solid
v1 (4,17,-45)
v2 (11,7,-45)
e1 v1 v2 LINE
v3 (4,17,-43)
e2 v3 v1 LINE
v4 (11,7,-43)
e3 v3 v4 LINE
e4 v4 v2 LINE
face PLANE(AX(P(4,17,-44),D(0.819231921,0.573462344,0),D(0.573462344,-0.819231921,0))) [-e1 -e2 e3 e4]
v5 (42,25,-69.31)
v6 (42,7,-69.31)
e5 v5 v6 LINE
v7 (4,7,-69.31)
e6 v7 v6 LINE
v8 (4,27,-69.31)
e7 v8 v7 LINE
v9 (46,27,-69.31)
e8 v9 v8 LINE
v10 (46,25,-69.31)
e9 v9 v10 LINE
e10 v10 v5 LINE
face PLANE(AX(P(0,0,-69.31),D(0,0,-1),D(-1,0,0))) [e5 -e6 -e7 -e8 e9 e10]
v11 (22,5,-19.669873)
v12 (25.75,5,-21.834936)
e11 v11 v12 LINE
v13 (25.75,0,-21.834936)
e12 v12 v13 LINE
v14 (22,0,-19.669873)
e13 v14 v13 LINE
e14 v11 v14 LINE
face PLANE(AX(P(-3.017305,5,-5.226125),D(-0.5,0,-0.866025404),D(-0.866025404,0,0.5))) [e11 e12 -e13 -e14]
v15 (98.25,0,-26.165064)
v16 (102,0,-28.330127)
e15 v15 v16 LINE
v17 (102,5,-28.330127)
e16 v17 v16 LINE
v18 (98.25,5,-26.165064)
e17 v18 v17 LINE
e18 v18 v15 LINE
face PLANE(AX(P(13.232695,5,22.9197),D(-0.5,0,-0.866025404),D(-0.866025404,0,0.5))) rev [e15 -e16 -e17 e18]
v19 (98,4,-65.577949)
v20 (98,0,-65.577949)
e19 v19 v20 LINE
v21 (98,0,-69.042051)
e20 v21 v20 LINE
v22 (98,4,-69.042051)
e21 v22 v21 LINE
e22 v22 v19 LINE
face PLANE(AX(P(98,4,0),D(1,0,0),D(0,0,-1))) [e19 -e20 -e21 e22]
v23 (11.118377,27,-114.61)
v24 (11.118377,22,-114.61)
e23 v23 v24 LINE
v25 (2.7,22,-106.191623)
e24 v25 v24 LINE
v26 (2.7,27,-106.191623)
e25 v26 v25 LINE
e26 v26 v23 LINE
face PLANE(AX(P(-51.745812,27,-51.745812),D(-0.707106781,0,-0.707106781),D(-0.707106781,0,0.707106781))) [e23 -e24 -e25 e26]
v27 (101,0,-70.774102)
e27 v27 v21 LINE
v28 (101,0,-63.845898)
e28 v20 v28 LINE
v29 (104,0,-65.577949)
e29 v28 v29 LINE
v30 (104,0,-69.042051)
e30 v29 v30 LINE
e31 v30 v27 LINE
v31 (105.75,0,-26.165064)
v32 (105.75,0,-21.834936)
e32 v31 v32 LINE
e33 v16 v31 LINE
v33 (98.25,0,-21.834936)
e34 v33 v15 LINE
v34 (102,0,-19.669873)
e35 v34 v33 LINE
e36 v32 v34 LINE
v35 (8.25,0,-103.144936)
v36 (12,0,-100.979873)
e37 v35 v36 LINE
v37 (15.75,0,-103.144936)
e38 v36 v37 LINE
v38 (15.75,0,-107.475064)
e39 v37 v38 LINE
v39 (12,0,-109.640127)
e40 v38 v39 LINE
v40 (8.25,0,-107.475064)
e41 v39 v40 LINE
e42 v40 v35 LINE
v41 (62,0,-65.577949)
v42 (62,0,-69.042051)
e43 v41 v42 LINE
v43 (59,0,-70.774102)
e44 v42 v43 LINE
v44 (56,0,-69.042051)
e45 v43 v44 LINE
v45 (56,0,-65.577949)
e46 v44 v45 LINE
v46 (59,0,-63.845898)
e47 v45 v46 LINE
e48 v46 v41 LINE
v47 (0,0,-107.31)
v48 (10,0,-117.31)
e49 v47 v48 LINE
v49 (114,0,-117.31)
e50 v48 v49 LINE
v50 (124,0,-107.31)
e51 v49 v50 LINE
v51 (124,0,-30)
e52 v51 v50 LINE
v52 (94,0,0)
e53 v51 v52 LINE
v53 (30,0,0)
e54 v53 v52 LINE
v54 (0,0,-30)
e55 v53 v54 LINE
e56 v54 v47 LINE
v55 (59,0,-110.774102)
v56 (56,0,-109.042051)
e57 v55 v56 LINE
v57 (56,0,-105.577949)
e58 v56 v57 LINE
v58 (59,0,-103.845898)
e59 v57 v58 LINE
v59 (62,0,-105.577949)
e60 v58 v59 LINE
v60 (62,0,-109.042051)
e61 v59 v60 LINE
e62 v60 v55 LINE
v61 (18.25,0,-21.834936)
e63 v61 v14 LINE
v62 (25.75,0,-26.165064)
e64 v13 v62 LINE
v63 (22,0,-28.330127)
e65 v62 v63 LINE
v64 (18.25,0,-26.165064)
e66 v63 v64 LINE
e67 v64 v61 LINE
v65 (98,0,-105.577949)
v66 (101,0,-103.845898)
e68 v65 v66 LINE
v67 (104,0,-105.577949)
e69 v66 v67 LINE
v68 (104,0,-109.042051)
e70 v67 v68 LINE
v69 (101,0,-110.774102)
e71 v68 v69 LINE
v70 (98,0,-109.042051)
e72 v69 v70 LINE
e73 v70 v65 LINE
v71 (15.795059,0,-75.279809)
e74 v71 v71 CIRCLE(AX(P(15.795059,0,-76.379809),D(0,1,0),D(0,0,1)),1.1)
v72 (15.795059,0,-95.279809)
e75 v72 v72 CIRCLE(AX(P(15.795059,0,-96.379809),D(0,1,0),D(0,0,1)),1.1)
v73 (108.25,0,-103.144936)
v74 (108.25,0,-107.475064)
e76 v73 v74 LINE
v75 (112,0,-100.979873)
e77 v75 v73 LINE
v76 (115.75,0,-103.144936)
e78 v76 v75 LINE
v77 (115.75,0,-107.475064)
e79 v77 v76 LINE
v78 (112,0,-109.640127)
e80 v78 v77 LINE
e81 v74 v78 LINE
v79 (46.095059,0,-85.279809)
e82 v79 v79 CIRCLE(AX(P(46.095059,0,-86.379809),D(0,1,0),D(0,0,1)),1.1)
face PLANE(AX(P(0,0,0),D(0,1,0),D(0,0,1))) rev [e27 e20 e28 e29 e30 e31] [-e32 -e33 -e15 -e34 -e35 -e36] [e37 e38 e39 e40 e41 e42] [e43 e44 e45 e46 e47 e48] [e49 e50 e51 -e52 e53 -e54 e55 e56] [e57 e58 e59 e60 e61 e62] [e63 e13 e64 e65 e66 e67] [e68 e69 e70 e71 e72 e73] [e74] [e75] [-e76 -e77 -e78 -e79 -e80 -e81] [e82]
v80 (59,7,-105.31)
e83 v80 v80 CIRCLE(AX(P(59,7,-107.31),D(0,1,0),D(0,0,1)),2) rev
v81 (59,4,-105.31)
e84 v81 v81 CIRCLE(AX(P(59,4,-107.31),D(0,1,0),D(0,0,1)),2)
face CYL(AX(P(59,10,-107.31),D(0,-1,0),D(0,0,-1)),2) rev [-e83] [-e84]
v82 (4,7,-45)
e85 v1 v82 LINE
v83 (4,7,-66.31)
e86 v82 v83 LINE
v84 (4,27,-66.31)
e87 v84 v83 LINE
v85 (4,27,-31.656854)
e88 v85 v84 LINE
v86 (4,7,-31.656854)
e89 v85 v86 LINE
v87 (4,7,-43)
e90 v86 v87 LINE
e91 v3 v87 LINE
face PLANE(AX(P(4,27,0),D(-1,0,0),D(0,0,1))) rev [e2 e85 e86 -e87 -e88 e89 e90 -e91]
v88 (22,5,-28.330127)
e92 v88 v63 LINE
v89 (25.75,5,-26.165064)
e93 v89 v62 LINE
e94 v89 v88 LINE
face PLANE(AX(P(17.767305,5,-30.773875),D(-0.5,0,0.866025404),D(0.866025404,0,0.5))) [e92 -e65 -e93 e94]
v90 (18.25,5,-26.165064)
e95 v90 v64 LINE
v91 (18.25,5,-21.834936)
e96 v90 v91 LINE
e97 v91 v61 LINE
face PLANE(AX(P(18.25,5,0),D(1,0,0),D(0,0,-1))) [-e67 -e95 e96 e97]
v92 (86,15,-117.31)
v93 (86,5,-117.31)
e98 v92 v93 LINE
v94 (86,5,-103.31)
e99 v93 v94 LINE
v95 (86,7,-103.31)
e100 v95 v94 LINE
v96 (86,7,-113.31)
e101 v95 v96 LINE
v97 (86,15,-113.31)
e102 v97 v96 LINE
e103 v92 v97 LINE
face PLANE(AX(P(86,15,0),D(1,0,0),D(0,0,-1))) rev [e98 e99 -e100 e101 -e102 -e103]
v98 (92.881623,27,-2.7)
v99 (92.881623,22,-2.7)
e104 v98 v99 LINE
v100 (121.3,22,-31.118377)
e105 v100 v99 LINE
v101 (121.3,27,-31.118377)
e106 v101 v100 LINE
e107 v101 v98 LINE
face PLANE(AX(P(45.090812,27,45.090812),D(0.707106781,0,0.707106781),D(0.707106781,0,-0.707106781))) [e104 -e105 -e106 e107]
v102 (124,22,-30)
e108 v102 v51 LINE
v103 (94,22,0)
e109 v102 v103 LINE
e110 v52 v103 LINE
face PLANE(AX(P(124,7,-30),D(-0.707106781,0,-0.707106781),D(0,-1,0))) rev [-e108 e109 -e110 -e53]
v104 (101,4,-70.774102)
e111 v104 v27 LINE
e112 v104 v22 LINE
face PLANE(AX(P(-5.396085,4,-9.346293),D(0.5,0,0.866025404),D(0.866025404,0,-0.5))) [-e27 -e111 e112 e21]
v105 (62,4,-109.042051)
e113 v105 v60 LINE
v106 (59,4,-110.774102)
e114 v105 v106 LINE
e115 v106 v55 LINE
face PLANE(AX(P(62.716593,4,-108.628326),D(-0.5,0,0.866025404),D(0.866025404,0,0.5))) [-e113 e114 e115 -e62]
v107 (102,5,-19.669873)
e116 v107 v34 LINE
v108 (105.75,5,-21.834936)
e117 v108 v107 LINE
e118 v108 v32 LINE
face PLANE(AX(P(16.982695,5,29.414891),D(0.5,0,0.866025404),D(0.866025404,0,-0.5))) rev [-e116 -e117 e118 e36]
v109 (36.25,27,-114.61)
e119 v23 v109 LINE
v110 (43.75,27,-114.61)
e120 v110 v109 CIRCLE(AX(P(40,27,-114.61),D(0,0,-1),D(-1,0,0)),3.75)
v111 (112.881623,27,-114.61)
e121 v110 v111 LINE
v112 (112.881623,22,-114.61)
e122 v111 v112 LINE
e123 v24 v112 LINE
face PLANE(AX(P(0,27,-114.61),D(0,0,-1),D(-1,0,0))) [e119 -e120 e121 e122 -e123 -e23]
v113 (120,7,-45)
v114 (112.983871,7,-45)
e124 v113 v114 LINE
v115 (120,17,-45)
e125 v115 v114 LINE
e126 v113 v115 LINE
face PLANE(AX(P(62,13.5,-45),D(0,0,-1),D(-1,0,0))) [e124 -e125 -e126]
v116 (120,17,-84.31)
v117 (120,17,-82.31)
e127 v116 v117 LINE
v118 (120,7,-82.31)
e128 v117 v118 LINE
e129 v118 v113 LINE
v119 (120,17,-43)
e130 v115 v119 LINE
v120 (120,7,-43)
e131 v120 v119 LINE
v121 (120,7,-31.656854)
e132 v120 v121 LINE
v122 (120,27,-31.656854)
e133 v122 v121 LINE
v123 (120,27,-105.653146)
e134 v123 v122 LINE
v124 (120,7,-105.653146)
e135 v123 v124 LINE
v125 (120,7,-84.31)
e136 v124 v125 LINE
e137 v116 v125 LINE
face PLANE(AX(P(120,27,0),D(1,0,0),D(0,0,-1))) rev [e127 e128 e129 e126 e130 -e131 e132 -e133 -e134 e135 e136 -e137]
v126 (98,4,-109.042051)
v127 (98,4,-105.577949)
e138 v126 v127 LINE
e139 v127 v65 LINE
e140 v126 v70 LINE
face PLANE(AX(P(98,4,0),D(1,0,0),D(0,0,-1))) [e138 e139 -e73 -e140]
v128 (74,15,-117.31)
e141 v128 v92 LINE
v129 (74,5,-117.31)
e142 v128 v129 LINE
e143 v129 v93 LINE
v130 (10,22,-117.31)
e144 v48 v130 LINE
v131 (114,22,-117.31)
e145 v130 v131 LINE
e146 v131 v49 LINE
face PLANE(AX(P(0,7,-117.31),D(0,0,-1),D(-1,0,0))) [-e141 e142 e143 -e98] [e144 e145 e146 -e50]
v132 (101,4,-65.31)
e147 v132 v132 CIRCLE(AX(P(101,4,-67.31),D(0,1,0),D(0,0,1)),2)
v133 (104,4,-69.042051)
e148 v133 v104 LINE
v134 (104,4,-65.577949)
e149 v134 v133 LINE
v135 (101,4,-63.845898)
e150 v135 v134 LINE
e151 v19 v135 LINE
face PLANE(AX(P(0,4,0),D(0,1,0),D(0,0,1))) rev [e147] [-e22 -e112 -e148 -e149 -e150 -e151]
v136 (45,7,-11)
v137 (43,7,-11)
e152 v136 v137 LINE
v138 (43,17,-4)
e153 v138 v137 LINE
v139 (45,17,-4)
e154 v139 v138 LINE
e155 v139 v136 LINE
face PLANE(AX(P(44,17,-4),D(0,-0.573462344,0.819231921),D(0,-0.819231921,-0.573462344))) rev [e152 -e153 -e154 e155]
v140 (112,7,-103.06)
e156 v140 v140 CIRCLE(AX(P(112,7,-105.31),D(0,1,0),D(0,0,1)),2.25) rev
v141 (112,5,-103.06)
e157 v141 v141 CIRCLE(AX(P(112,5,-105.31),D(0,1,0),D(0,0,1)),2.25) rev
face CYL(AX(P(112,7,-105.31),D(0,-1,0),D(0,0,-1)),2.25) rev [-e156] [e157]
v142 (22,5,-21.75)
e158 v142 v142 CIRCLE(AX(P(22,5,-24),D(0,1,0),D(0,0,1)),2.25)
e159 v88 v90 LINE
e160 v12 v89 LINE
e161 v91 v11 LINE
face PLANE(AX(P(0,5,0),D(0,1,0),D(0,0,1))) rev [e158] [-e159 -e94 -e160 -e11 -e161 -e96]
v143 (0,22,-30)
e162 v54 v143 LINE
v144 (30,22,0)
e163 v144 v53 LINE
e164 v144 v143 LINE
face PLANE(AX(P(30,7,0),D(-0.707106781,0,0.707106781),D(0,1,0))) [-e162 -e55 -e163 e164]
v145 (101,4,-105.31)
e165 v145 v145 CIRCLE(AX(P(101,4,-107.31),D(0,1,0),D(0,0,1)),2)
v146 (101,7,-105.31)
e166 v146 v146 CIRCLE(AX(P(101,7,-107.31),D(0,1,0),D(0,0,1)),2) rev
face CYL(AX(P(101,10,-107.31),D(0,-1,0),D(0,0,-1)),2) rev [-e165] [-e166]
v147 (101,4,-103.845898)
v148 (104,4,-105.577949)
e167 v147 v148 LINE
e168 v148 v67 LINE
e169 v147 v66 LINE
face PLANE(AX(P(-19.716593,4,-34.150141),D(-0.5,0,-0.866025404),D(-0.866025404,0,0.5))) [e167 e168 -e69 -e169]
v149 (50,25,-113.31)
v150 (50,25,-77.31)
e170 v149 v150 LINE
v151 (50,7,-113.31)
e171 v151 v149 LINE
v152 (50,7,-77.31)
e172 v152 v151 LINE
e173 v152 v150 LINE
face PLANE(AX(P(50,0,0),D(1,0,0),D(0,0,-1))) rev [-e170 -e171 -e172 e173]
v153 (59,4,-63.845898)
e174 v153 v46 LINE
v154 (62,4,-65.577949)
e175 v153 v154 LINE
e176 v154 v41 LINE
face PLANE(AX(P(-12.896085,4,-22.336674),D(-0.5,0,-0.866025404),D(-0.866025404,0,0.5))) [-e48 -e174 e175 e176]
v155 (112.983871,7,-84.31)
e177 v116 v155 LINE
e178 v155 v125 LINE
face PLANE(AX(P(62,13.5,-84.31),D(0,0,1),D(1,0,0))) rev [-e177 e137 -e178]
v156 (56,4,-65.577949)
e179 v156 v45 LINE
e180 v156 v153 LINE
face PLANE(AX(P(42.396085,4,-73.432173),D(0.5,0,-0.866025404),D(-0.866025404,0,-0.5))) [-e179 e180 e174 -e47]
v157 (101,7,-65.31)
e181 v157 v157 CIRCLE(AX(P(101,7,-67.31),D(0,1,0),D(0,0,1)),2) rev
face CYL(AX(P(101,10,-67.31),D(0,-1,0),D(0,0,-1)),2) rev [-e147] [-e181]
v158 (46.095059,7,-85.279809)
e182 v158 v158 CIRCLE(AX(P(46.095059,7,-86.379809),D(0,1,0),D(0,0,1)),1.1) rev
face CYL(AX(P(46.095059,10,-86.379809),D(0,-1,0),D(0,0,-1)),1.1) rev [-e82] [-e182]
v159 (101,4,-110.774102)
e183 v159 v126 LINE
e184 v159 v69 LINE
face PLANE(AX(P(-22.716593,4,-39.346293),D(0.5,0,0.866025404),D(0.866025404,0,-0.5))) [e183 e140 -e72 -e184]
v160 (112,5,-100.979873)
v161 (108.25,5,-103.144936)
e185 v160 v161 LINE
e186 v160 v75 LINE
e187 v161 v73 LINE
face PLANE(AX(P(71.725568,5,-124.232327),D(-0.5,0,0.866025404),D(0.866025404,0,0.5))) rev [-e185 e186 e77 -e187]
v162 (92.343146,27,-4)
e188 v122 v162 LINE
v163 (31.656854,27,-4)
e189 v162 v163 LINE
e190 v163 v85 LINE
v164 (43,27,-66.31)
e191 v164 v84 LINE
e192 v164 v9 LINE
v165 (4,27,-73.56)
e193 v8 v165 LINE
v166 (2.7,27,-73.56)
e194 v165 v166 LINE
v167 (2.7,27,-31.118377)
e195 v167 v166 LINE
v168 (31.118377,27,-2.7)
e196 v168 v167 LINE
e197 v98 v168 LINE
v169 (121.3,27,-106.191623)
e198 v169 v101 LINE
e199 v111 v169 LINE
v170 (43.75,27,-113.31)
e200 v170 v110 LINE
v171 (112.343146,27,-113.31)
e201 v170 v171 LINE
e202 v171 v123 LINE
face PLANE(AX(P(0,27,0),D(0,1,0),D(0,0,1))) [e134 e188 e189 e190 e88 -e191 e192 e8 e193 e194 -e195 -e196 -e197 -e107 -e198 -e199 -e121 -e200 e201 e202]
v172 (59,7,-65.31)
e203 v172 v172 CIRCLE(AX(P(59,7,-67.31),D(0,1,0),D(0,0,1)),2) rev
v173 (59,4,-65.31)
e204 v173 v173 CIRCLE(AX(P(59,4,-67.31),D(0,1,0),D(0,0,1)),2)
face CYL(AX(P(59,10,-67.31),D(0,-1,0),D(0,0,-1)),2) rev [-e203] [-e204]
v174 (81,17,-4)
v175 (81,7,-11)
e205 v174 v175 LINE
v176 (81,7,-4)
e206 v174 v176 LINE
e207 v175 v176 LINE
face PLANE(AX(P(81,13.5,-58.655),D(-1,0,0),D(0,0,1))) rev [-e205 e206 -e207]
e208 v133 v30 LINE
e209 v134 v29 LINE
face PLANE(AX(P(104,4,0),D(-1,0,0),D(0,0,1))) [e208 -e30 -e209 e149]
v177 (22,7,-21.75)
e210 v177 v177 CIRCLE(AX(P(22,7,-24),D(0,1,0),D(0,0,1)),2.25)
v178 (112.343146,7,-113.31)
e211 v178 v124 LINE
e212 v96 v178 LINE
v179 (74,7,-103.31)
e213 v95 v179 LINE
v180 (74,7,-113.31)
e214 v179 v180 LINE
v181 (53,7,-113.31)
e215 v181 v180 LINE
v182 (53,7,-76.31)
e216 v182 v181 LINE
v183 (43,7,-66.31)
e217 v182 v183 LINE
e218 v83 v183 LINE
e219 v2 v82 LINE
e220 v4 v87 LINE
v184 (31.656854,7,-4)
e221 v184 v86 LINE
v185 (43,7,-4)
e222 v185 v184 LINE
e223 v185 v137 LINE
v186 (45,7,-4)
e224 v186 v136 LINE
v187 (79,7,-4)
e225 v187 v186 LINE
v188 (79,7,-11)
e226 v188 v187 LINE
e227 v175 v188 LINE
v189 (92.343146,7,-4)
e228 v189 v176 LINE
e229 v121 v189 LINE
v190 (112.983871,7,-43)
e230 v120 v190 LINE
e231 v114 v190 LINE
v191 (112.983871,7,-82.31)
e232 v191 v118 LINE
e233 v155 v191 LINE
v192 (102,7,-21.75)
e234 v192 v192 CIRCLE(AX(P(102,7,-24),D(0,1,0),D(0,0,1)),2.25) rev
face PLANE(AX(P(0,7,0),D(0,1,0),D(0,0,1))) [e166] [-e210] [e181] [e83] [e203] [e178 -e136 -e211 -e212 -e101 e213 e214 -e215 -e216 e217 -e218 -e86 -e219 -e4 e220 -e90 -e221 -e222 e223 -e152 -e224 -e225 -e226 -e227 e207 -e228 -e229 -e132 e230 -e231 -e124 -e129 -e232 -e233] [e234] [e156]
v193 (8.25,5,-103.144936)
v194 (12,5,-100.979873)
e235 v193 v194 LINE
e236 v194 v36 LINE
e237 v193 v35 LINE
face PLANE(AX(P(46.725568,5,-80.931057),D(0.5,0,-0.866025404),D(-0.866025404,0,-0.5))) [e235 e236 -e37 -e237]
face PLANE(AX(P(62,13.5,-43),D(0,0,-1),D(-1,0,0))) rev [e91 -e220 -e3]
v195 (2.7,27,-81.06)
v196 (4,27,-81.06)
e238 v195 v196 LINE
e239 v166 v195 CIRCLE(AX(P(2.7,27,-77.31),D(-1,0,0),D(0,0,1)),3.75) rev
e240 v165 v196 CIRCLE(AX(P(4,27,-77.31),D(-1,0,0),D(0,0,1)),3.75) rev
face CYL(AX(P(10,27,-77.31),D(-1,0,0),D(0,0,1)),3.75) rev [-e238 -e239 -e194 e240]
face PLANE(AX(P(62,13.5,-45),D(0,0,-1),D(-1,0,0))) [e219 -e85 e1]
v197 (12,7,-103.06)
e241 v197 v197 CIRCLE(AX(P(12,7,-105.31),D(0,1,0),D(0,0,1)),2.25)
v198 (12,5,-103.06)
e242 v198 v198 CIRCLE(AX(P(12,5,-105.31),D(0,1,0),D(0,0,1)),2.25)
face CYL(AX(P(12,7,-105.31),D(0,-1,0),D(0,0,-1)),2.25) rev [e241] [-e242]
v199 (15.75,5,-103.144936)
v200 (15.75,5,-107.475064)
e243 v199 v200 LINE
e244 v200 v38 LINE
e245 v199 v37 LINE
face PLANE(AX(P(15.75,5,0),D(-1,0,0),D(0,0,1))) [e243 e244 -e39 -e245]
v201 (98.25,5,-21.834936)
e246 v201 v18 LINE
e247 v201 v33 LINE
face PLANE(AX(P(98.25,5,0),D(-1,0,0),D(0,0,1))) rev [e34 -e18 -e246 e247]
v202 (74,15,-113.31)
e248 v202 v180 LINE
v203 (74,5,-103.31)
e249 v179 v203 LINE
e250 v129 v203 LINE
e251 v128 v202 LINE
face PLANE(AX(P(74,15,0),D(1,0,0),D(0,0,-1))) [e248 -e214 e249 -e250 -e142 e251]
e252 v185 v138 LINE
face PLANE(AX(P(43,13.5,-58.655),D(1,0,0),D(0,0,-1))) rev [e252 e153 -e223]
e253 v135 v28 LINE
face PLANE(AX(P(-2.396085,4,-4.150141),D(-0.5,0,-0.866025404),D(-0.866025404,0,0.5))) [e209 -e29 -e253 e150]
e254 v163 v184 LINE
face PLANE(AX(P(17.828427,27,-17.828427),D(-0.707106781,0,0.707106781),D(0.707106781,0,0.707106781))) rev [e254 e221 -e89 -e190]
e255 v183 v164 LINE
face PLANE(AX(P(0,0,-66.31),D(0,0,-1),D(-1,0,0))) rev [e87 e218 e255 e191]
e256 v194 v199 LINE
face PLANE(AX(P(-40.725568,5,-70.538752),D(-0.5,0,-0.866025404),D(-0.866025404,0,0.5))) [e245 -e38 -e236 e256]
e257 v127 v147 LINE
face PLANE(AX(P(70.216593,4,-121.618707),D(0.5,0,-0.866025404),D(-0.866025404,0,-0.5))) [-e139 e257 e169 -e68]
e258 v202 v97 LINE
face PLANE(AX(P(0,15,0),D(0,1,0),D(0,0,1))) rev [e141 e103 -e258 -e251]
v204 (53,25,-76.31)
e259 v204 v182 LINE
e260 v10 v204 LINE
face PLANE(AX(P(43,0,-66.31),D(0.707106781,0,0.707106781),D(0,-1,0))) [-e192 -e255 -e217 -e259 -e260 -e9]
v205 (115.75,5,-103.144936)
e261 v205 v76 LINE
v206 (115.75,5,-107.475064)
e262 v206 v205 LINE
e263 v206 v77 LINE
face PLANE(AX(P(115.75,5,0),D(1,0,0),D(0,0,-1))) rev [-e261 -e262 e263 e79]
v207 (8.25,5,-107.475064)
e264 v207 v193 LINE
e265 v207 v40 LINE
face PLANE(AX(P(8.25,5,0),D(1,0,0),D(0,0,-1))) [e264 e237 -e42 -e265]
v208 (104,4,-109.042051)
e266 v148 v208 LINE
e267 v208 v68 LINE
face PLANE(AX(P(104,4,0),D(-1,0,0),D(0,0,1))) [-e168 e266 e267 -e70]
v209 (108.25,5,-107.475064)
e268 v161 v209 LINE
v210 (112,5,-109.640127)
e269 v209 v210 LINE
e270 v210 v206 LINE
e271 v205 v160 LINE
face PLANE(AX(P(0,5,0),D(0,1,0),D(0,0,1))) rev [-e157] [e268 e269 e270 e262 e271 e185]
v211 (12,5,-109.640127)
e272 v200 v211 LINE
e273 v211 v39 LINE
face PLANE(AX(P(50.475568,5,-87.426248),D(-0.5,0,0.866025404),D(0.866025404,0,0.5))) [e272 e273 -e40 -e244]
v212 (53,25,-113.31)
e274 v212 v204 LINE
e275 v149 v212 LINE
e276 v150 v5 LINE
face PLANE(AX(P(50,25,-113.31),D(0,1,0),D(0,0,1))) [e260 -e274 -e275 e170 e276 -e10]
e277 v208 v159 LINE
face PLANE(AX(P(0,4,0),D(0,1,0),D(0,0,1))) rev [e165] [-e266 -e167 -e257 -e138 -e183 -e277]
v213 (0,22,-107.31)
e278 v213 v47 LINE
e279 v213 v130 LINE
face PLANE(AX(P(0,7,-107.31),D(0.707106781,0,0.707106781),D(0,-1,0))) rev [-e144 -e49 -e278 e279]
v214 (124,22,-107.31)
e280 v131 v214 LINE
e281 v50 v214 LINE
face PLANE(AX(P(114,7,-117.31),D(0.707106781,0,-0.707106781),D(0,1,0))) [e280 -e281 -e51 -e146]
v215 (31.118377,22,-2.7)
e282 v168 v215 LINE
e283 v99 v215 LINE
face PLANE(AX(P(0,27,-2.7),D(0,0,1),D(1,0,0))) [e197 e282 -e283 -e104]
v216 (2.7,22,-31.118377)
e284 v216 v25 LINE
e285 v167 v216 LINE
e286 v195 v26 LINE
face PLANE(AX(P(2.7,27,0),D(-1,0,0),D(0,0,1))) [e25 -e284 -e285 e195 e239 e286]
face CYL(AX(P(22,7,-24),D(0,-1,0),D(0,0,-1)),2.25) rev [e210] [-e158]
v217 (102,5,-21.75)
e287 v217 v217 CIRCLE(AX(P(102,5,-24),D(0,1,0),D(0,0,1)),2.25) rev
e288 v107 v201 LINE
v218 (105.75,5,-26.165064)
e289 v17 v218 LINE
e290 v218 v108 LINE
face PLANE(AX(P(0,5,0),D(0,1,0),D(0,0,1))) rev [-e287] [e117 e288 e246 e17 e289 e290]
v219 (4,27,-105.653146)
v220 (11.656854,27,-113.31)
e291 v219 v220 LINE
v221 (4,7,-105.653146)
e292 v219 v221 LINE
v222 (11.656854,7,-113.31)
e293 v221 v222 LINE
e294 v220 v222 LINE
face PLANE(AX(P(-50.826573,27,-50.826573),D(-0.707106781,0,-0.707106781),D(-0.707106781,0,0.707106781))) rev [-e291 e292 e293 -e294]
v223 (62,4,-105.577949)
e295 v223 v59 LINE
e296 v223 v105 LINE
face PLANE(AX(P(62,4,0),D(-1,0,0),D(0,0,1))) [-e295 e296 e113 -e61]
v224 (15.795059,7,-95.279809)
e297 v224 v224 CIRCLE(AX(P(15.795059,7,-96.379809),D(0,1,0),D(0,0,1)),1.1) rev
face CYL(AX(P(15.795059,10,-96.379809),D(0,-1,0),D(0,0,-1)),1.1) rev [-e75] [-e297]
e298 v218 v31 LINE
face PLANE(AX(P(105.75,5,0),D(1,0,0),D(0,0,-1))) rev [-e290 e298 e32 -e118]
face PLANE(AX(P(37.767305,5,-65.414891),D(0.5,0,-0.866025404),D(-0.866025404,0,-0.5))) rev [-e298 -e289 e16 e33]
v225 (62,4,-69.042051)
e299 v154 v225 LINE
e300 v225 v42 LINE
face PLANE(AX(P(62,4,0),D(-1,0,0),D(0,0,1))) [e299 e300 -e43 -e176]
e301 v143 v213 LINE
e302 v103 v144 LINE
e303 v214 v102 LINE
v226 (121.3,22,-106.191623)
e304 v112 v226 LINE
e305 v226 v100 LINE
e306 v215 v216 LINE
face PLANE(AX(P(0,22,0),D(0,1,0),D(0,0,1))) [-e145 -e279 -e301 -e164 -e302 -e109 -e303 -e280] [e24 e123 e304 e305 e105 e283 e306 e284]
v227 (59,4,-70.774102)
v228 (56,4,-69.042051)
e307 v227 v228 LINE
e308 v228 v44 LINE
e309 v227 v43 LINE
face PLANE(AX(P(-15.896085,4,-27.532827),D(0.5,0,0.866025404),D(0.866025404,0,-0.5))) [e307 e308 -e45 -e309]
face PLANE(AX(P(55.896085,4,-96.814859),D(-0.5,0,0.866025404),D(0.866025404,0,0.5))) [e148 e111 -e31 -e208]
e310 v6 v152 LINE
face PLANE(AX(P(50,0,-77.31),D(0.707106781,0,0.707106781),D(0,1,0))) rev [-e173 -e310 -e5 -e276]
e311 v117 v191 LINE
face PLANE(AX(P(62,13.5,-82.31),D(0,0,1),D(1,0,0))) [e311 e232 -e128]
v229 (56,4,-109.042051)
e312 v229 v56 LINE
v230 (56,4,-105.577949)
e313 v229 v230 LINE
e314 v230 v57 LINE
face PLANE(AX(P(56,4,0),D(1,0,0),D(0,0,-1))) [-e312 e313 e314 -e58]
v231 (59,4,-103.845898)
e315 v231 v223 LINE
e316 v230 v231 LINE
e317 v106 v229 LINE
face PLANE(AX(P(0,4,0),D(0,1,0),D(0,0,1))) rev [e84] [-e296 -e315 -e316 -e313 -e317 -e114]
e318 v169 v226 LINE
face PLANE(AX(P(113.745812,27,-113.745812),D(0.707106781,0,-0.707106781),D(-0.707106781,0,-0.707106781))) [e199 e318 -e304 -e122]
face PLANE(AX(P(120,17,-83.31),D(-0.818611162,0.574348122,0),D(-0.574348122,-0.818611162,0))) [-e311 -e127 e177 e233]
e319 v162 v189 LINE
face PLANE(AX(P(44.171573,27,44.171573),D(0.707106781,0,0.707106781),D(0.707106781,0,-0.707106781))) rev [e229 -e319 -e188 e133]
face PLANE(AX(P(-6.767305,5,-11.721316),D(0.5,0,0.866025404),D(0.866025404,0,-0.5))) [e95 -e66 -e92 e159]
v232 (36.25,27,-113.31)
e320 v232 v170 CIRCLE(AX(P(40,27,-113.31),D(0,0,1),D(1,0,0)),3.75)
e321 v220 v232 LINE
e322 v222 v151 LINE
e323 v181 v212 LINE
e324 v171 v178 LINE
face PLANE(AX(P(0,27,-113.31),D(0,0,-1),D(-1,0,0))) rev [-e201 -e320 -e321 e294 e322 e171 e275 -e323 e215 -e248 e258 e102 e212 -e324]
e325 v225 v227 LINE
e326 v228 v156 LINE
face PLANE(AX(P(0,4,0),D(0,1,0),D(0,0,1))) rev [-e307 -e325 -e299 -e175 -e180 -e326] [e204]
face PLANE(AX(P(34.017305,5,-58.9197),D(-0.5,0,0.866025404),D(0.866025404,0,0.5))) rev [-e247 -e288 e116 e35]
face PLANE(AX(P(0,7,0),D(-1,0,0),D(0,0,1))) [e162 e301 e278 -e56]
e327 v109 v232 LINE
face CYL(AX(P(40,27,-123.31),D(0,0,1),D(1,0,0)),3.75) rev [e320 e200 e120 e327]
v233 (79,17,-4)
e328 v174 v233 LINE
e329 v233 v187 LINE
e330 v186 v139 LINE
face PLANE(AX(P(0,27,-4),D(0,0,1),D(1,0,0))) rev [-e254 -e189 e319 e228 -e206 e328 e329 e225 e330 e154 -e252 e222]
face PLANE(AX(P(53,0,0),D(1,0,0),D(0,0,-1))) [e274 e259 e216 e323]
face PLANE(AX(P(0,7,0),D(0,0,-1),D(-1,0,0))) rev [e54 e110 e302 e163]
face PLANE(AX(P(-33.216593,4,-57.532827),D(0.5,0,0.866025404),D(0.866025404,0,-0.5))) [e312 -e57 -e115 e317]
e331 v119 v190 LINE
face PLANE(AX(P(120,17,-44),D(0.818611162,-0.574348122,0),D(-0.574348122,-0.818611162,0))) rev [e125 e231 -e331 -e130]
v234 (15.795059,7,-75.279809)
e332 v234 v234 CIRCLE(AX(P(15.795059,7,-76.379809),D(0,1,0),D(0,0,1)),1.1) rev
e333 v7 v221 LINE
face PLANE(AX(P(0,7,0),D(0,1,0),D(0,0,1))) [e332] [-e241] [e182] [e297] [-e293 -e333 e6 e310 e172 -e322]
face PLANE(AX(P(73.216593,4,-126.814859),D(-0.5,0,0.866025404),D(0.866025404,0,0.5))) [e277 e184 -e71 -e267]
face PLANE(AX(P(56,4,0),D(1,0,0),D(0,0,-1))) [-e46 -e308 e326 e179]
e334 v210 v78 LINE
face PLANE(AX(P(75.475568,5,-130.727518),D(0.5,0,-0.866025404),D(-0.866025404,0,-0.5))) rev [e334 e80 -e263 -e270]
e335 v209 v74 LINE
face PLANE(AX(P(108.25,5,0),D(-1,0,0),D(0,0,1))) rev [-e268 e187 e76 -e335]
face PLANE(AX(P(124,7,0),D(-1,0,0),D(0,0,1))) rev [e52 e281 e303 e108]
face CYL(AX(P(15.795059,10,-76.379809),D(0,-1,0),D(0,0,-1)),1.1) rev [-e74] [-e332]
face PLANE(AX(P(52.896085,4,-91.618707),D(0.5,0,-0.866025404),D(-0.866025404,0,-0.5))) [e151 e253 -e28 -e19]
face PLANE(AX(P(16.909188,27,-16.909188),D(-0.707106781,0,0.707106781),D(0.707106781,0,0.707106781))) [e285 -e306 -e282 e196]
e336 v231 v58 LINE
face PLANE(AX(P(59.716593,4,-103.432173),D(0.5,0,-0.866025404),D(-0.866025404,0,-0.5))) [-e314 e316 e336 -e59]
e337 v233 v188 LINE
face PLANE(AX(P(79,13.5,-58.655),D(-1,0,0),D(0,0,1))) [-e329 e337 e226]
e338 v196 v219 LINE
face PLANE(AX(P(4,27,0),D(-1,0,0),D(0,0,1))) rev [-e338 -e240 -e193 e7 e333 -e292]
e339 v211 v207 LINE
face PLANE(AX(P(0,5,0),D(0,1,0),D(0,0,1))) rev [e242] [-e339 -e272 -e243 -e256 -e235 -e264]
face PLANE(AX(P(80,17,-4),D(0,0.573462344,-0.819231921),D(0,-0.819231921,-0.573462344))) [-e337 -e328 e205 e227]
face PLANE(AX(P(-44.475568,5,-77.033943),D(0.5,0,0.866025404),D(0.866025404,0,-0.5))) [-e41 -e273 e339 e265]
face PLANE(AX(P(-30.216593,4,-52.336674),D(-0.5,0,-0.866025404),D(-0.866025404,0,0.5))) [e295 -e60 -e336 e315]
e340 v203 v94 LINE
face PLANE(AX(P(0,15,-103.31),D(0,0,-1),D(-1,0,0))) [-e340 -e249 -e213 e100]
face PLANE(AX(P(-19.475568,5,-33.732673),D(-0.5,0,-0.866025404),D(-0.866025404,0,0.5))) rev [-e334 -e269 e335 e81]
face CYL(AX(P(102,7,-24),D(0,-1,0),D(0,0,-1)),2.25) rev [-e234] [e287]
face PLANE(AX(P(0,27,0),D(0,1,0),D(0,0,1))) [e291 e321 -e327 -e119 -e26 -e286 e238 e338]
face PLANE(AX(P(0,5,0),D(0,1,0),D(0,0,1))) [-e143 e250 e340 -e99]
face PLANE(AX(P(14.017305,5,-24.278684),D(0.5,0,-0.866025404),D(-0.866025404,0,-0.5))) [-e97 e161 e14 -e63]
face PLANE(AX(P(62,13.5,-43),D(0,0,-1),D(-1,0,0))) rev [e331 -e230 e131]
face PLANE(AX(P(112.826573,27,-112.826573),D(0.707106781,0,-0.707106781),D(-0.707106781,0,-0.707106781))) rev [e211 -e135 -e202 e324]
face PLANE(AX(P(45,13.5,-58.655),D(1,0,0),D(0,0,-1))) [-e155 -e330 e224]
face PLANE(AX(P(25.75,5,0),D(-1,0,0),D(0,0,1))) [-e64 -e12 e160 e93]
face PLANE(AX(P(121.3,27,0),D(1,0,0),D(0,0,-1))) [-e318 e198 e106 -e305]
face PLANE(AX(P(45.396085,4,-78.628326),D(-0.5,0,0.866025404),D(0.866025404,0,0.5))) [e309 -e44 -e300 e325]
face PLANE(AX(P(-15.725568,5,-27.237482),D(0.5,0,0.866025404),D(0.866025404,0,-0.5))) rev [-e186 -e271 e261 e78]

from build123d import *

# Parameters (mm, degrees)
ESQUISSE1_W              = 124
ESQUISSE1_H              = 117.31
ESQUISSE1_R              = 2.25
BOSS_EXTRU_1_DEPTH       = 7
CHANFREIN1_SIZE          = 30
CHANFREIN2_SIZE          = 10
ESQUISSE1_4_R            = 2.25
ENL_V_MAT_EXTRU_1_DEPTH  = 5
BOSS_EXTRU_2_START       = 7
BOSS_EXTRU_2_DEPTH       = 15
BOSS_EXTRU_3_START       = 7
BOSS_EXTRU_3_DEPTH       = 20
ENL_V_START              = -113.31
ESQUISSE4_R              = 3.75
ENL_V_MAT_EXTRU_5_DEPTH  = 10
ESQUISSE3_R              = 3.75
ENL_V_MAT_EXTRU_6_DEPTH  = 10
ESQUISSE6_R              = 2
ENL_V_MAT_EXTRU_7_DEPTH  = 10
ESQUISSE6_8_R            = 2
ENL_V_MAT_EXTRU_8_DEPTH  = 4
ENL_V_START_2            = 5
ESQUISSE6_9_W            = 8.5
ESQUISSE6_9_H            = 7.5
ESQUISSE6_9_H_2          = 1.6
ENL_V_MAT_EXTRU_9_DEPTH  = 10
NERVURE1_START           = -1
NERVURE1_DEPTH           = 2
NERVURE3_REACH           = 146.536
ESQUISSE9_WALL_W         = 303.278422804
ESQUISSE9_WALL_H         = 2
NERVURE6_START           = -1
NERVURE6_DEPTH           = 2
NERVURE7_REACH           = 148.558
ESQUISSE11_WALL_W        = 307.323297546
ESQUISSE11_WALL_H        = 2
ENL_V_MAT_EXTRU_11_DEPTH = 10
BOSS_EXTRU_4_DEPTH       = 2
BOSS_EXTRU_4_DEPTH_BACK  = 1
ESQUISSE14_W             = 45
ESQUISSE14_H             = 18
BOSS_EXTRU_5_DEPTH       = 2
BOSS_EXTRU_5_DEPTH_BACK  = 1
ESQUISSE15_W             = 49
ESQUISSE15_H             = 20
CHANFREIN3_SIZE          = 8
CHANFREIN4_SIZE          = 10
NERVURE8_REACH           = 153.808
ESQUISSE16_WALL_W        = 317.831069122
ESQUISSE16_WALL_H        = 2


# Read off the part's stored shape, not the designer's step: Nervure1, Nervure6
with BuildPart() as part:
    # Esquisse1 → Boss.-Extru.1 (new body)
    # profile 1 of 5: a face of its own
    with BuildSketch(Plane(origin=(0, 0, 0), x_dir=(1, 0, 0), z_dir=(0, 1, 0))):
        with Locations((62, 58.655)):
            Rectangle(ESQUISSE1_W, ESQUISSE1_H)
        Polygon((22, 19.669872981), (25.75, 21.834936491), (25.75, 26.165063509), (22, 28.330127019), (18.25, 26.165063509), (18.25, 21.834936491), align=None, mode=Mode.SUBTRACT)
        Polygon((12, 100.979872981), (15.75, 103.144936491), (15.75, 107.475063509), (12, 109.640127019), (8.25, 107.475063509), (8.25, 103.144936491), align=None, mode=Mode.SUBTRACT)
        Polygon((102, 19.669872981), (98.25, 21.834936491), (98.25, 26.165063509), (102, 28.330127019), (105.75, 26.165063509), (105.75, 21.834936491), align=None, mode=Mode.SUBTRACT)
        Polygon((112, 100.979872981), (108.25, 103.144936491), (108.25, 107.475063509), (112, 109.640127019), (115.75, 107.475063509), (115.75, 103.144936491), align=None, mode=Mode.SUBTRACT)
    # profile 2 of 5: a face of its own
    with BuildSketch(Plane(origin=(0, 0, 0), x_dir=(1, 0, 0), z_dir=(0, 1, 0))):
        Polygon((18.25, 21.834936491), (22, 19.669872981), (25.75, 21.834936491), (25.75, 26.165063509), (22, 28.330127019), (18.25, 26.165063509), align=None)
        with Locations(Location((22, 24, 0), (0, 0, 270))):
            Circle(ESQUISSE1_R, mode=Mode.SUBTRACT)
    # profile 3 of 5: a face of its own
    with BuildSketch(Plane(origin=(0, 0, 0), x_dir=(1, 0, 0), z_dir=(0, 1, 0))):
        Polygon((8.25, 103.144936491), (12, 100.979872981), (15.75, 103.144936491), (15.75, 107.475063509), (12, 109.640127019), (8.25, 107.475063509), align=None)
        with Locations(Location((12, 105.31, 0), (0, 0, 270))):
            Circle(ESQUISSE1_R, mode=Mode.SUBTRACT)
    # profile 4 of 5: a face of its own
    with BuildSketch(Plane(origin=(0, 0, 0), x_dir=(1, 0, 0), z_dir=(0, 1, 0))):
        Polygon((108.25, 103.144936491), (108.25, 107.475063509), (112, 109.640127019), (115.75, 107.475063509), (115.75, 103.144936491), (112, 100.979872981), align=None)
        with Locations(Location((112, 105.31, 0), (0, 0, 270))):
            Circle(ESQUISSE1_R, mode=Mode.SUBTRACT)
    # profile 5 of 5: a face of its own
    with BuildSketch(Plane(origin=(0, 0, 0), x_dir=(1, 0, 0), z_dir=(0, 1, 0))):
        Polygon((98.25, 21.834936491), (98.25, 26.165063509), (102, 28.330127019), (105.75, 26.165063509), (105.75, 21.834936491), (102, 19.669872981), align=None)
        with Locations(Location((102, 24, 0), (0, 0, 270))):
            Circle(ESQUISSE1_R, mode=Mode.SUBTRACT)
    extrude(amount=BOSS_EXTRU_1_DEPTH)

    # Chanfrein1
    chanfrein1_edges = [part.edges().sort_by_distance(p)[0] for p in [
        (0, 3.5, 0),
        (124, 3.5, 0),
    ]]
    chamfer(chanfrein1_edges, length=CHANFREIN1_SIZE)

    # Chanfrein2
    chanfrein2_edges = [part.edges().sort_by_distance(p)[0] for p in [
        (0, 3.5, -117.31),
        (124, 3.5, -117.31),
    ]]
    chamfer(chanfrein2_edges, length=CHANFREIN2_SIZE)

    # Esquisse1<4> → Enlèv. mat.-Extru.1 (cut)
    # profile 1 of 4: a face of its own
    with BuildSketch(Plane(origin=(0, 0, 0), x_dir=(1, 0, 0), z_dir=(0, 1, 0))):
        Polygon((8.25, 103.144936491), (12, 100.979872981), (15.75, 103.144936491), (15.75, 107.475063509), (12, 109.640127019), (8.25, 107.475063509), align=None)
        with Locations(Location((12, 105.31, 0), (0, 0, 270))):
            Circle(ESQUISSE1_4_R, mode=Mode.SUBTRACT)
    # profile 2 of 4: a face of its own
    with BuildSketch(Plane(origin=(0, 0, 0), x_dir=(1, 0, 0), z_dir=(0, 1, 0))):
        Polygon((18.25, 21.834936491), (22, 19.669872981), (25.75, 21.834936491), (25.75, 26.165063509), (22, 28.330127019), (18.25, 26.165063509), align=None)
        with Locations(Location((22, 24, 0), (0, 0, 270))):
            Circle(ESQUISSE1_4_R, mode=Mode.SUBTRACT)
    # profile 3 of 4: a face of its own
    with BuildSketch(Plane(origin=(0, 0, 0), x_dir=(1, 0, 0), z_dir=(0, 1, 0))):
        Polygon((98.25, 21.834936491), (98.25, 26.165063509), (102, 28.330127019), (105.75, 26.165063509), (105.75, 21.834936491), (102, 19.669872981), align=None)
        with Locations(Location((102, 24, 0), (0, 0, 270))):
            Circle(ESQUISSE1_4_R, mode=Mode.SUBTRACT)
    # profile 4 of 4: a face of its own
    with BuildSketch(Plane(origin=(0, 0, 0), x_dir=(1, 0, 0), z_dir=(0, 1, 0))):
        Polygon((108.25, 103.144936491), (108.25, 107.475063509), (112, 109.640127019), (115.75, 107.475063509), (115.75, 103.144936491), (112, 100.979872981), align=None)
        with Locations(Location((112, 105.31, 0), (0, 0, 270))):
            Circle(ESQUISSE1_4_R, mode=Mode.SUBTRACT)
    extrude(amount=ENL_V_MAT_EXTRU_1_DEPTH, mode=Mode.SUBTRACT)

    # Esquisse2 → Boss.-Extru.2 (add)
    with BuildSketch(Plane(origin=(0, 0, 0), x_dir=(1, 0, 0), z_dir=(0, 1, 0)).offset(BOSS_EXTRU_2_START)):
        Polygon((0, 30), (0, 107.31), (10, 117.31), (114, 117.31), (124, 107.31), (124, 30), (94, 0), (30, 0), align=None)
        Polygon((92.881623382, 2.7), (31.118376618, 2.7), (2.7, 31.118376618), (2.7, 106.191623382), (11.118376618, 114.61), (112.881623382, 114.61), (121.3, 106.191623382), (121.3, 31.118376618), align=None, mode=Mode.SUBTRACT)
    extrude(amount=BOSS_EXTRU_2_DEPTH)

    # Esquisse2<3> → Boss.-Extru.3 (add)
    with BuildSketch(Plane(origin=(0, 0, 0), x_dir=(1, 0, 0), z_dir=(0, 1, 0)).offset(BOSS_EXTRU_3_START)):
        Polygon((31.118376618, 2.7), (2.7, 31.118376618), (2.7, 106.191623382), (11.118376618, 114.61), (112.881623382, 114.61), (121.3, 106.191623382), (121.3, 31.118376618), (92.881623382, 2.7), align=None)
        Polygon((31.656854249, 4), (4, 31.656854249), (4, 105.653145751), (11.656854249, 113.31), (112.343145751, 113.31), (120, 105.653145751), (120, 31.656854249), (92.343145751, 4), align=None, mode=Mode.SUBTRACT)
    extrude(amount=BOSS_EXTRU_3_DEPTH)

    # Esquisse4 → Enlèv. mat.-Extru.5 (cut)
    with BuildSketch(Plane.XY.offset(ENL_V_START)):
        with Locations((40, 27)):
            Circle(ESQUISSE4_R)
    extrude(amount=-ENL_V_MAT_EXTRU_5_DEPTH, mode=Mode.SUBTRACT)

    # Esquisse3 → Enlèv. mat.-Extru.6 (cut)
    with BuildSketch(Plane(origin=(0, 0, 0), x_dir=(0, 0, -1), z_dir=(1, 0, 0))):
        with Locations((77.31, 27)):
            Circle(ESQUISSE3_R)
    extrude(amount=ENL_V_MAT_EXTRU_6_DEPTH, mode=Mode.SUBTRACT)

    # Esquisse6 → Enlèv. mat.-Extru.7 (cut)
    with BuildSketch(Plane(origin=(0, 0, 0), x_dir=(1, 0, 0), z_dir=(0, 1, 0))):
        with Locations(Location((101, 107.31, 0), (0, 0, 270))):
            Circle(ESQUISSE6_R)
        with Locations(Location((59, 107.31, 0), (0, 0, 270))):
            Circle(ESQUISSE6_R)
        with Locations(Location((59, 67.31, 0), (0, 0, 270))):
            Circle(ESQUISSE6_R)
        with Locations(Location((101, 67.31, 0), (0, 0, 270))):
            Circle(ESQUISSE6_R)
    extrude(amount=ENL_V_MAT_EXTRU_7_DEPTH, mode=Mode.SUBTRACT)

    # Esquisse6<8> → Enlèv. mat.-Extru.8 (cut)
    # profile 1 of 4: a face of its own
    with BuildSketch(Plane(origin=(0, 0, 0), x_dir=(1, 0, 0), z_dir=(0, 1, 0))):
        Polygon((98, 109.042050808), (98, 105.577949192), (101, 103.845898385), (104, 105.577949192), (104, 109.042050808), (101, 110.774101615), align=None)
        with Locations(Location((101, 107.31, 0), (0, 0, 270))):
            Circle(ESQUISSE6_8_R, mode=Mode.SUBTRACT)
    # profile 2 of 4: a face of its own
    with BuildSketch(Plane(origin=(0, 0, 0), x_dir=(1, 0, 0), z_dir=(0, 1, 0))):
        Polygon((56, 109.042050808), (56, 105.577949192), (59, 103.845898385), (62, 105.577949192), (62, 109.042050808), (59, 110.774101615), align=None)
        with Locations(Location((59, 107.31, 0), (0, 0, 270))):
            Circle(ESQUISSE6_8_R, mode=Mode.SUBTRACT)
    # profile 3 of 4: a face of its own
    with BuildSketch(Plane(origin=(0, 0, 0), x_dir=(1, 0, 0), z_dir=(0, 1, 0))):
        Polygon((56, 69.042050808), (56, 65.577949192), (59, 63.845898385), (62, 65.577949192), (62, 69.042050808), (59, 70.774101615), align=None)
        with Locations(Location((59, 67.31, 0), (0, 0, 270))):
            Circle(ESQUISSE6_8_R, mode=Mode.SUBTRACT)
    # profile 4 of 4: a face of its own
    with BuildSketch(Plane(origin=(0, 0, 0), x_dir=(1, 0, 0), z_dir=(0, 1, 0))):
        Polygon((98, 69.042050808), (98, 65.577949192), (101, 63.845898385), (104, 65.577949192), (104, 69.042050808), (101, 70.774101615), align=None)
        with Locations(Location((101, 67.31, 0), (0, 0, 270))):
            Circle(ESQUISSE6_8_R, mode=Mode.SUBTRACT)
    extrude(amount=ENL_V_MAT_EXTRU_8_DEPTH, mode=Mode.SUBTRACT)

    # Esquisse6<9> → Enlèv. mat.-Extru.9 (cut)
    with BuildSketch(Plane(origin=(0, 0, 0), x_dir=(1, 0, 0), z_dir=(0, 1, 0)).offset(ENL_V_START_2)):
        Polygon((74, 117.31), (74, 112.31), (75.75, 112.31), (75.75, 113.91), (84.25, 113.91), (84.25, 112.31), (86, 112.31), (86, 117.31), align=None)
        Polygon((75.75, 112.31), (74, 112.31), (74, 103.31), (86, 103.31), (86, 112.31), (84.25, 112.31), (84.25, 104.81), (75.75, 104.81), align=None)
        with Locations((80, 108.56)):
            Rectangle(ESQUISSE6_9_W, ESQUISSE6_9_H)
        with Locations((80, 113.11)):
            Rectangle(ESQUISSE6_9_W, ESQUISSE6_9_H_2)
    extrude(amount=ENL_V_MAT_EXTRU_9_DEPTH, mode=Mode.SUBTRACT)

    # Nervure1 outline → Nervure1 (add)
    with BuildSketch(Plane(origin=(44, 0, 0), x_dir=(0, 0, -1), z_dir=(1, 0, 0)).offset(NERVURE1_START)):
        Polygon((11, 7), (4, 17), (4, 7), align=None)
    extrude(amount=NERVURE1_DEPTH)

    # Esquisse9 wall → Nervure3 (add, up to next)
    with BuildSketch(Plane(origin=(80, 12, -7.5), x_dir=(0, -0.819231920519, -0.573462344363), z_dir=(0, -0.573462344363, 0.819231920519)), mode=Mode.PRIVATE) as nervure3_sk1:
        Rectangle(ESQUISSE9_WALL_W, ESQUISSE9_WALL_H)
    nervure3_tool1 = extrude(nervure3_sk1.sketch, amount=NERVURE3_REACH, mode=Mode.PRIVATE) - part.part
    add(nervure3_tool1.solids().sort_by_distance((80, 12, -7.5))[0])

    # Nervure6 outline → Nervure6 (add)
    with BuildSketch(Plane(origin=(0, 0, -44), x_dir=(-1, 0, 0), z_dir=(0, 0, -1)).offset(NERVURE6_START)):
        Polygon((-112.98387136, 7), (-120, 17), (-120, 7), align=None)
    extrude(amount=NERVURE6_DEPTH)

    # Esquisse11 wall → Nervure7 (add, up to next)
    with BuildSketch(Plane(origin=(7.5, 12, -44), x_dir=(0.573462344363, -0.819231920519, 0), z_dir=(-0.819231920519, -0.573462344363, 0)), mode=Mode.PRIVATE) as nervure7_sk1:
        Rectangle(ESQUISSE11_WALL_W, ESQUISSE11_WALL_H)
    nervure7_tool1 = extrude(nervure7_sk1.sketch, amount=NERVURE7_REACH, mode=Mode.PRIVATE) - part.part
    add(nervure7_tool1.solids().sort_by_distance((7.5, 12, -44))[0])

    # Esquisse13 → Enlèv. mat.-Extru.11 (cut)
    with BuildSketch(Plane(origin=(57.878823339, 0, -164.935388349), x_dir=(-1, 0, 0), z_dir=(0, 1, 0))):
        with BuildLine():
            ThreePointArc((40.983764069, 68.555579041), (42.083764069, 67.455579041), (43.183764069, 68.555579041))
            Line((43.183764069, 68.555579041), (40.983764069, 68.555579041))
        make_face()
        with BuildLine():
            Line((40.983764069, 68.555579041), (43.183764069, 68.555579041))
            ThreePointArc((43.183764069, 68.555579041), (42.083764069, 69.655579041), (40.983764069, 68.555579041))
        make_face()
        with BuildLine():
            ThreePointArc((40.983764069, 88.555579041), (42.083764069, 87.455579041), (43.183764069, 88.555579041))
            Line((43.183764069, 88.555579041), (40.983764069, 88.555579041))
        make_face()
        with BuildLine():
            Line((40.983764069, 88.555579041), (43.183764069, 88.555579041))
            ThreePointArc((43.183764069, 88.555579041), (42.083764069, 89.655579041), (40.983764069, 88.555579041))
        make_face()
        with BuildLine():
            ThreePointArc((11.783764069, 79.655579041), (10.683764069, 78.555579041), (11.783764069, 77.455579041))
            Line((11.783764069, 77.455579041), (11.783764069, 79.655579041))
        make_face()
        with BuildLine():
            Line((11.783764069, 79.655579041), (11.783764069, 77.455579041))
            ThreePointArc((11.783764069, 77.455579041), (12.561581528, 77.777761581), (12.883764069, 78.555579041))
            ThreePointArc((12.883764069, 78.555579041), (12.561581528, 79.3333965), (11.783764069, 79.655579041))
        make_face()
    extrude(amount=ENL_V_MAT_EXTRU_11_DEPTH, mode=Mode.SUBTRACT)

    # Esquisse14 → Boss.-Extru.4 (add, two sides: drawn at the far end of the back side and taken through both)
    with BuildSketch(Plane(origin=(51, 0, 0), x_dir=(0, 0, -1), z_dir=(1, 0, 0)).offset(-BOSS_EXTRU_4_DEPTH_BACK)):
        with Locations((90.81, 16)):
            Rectangle(ESQUISSE14_W, ESQUISSE14_H)
    extrude(amount=BOSS_EXTRU_4_DEPTH + BOSS_EXTRU_4_DEPTH_BACK)

    # Esquisse15 → Boss.-Extru.5 (add, two sides: drawn at the far end of the back side and taken through both)
    with BuildSketch(Plane.XY.offset(-68.31).offset(-BOSS_EXTRU_5_DEPTH_BACK)):
        with Locations((28.5, 17)):
            Rectangle(ESQUISSE15_W, ESQUISSE15_H)
    extrude(amount=BOSS_EXTRU_5_DEPTH + BOSS_EXTRU_5_DEPTH_BACK)

    # Chanfrein3
    chanfrein3_edges = [part.edges().sort_by_distance(p)[0] for p in [
        (50, 16, -69.31),
    ]]
    chamfer(chanfrein3_edges, length=CHANFREIN3_SIZE)

    # Chanfrein4
    chanfrein4_edges = [part.edges().sort_by_distance(p)[0] for p in [
        (53, 17, -66.31),
    ]]
    chamfer(chanfrein4_edges, length=CHANFREIN4_SIZE)

    # Esquisse16 wall → Nervure8 (add, up to next)
    with BuildSketch(Plane(origin=(116.49193568, 12, -83.31), x_dir=(-0.574348121974, -0.818611162143, 0), z_dir=(0.818611162143, -0.574348121974, 0)), mode=Mode.PRIVATE) as nervure8_sk1:
        Rectangle(ESQUISSE16_WALL_W, ESQUISSE16_WALL_H)
    nervure8_tool1 = extrude(nervure8_sk1.sketch, amount=NERVURE8_REACH, mode=Mode.PRIVATE) - part.part
    add(nervure8_tool1.solids().sort_by_distance((116.49193568, 12, -83.31))[0])


solid = part.part
